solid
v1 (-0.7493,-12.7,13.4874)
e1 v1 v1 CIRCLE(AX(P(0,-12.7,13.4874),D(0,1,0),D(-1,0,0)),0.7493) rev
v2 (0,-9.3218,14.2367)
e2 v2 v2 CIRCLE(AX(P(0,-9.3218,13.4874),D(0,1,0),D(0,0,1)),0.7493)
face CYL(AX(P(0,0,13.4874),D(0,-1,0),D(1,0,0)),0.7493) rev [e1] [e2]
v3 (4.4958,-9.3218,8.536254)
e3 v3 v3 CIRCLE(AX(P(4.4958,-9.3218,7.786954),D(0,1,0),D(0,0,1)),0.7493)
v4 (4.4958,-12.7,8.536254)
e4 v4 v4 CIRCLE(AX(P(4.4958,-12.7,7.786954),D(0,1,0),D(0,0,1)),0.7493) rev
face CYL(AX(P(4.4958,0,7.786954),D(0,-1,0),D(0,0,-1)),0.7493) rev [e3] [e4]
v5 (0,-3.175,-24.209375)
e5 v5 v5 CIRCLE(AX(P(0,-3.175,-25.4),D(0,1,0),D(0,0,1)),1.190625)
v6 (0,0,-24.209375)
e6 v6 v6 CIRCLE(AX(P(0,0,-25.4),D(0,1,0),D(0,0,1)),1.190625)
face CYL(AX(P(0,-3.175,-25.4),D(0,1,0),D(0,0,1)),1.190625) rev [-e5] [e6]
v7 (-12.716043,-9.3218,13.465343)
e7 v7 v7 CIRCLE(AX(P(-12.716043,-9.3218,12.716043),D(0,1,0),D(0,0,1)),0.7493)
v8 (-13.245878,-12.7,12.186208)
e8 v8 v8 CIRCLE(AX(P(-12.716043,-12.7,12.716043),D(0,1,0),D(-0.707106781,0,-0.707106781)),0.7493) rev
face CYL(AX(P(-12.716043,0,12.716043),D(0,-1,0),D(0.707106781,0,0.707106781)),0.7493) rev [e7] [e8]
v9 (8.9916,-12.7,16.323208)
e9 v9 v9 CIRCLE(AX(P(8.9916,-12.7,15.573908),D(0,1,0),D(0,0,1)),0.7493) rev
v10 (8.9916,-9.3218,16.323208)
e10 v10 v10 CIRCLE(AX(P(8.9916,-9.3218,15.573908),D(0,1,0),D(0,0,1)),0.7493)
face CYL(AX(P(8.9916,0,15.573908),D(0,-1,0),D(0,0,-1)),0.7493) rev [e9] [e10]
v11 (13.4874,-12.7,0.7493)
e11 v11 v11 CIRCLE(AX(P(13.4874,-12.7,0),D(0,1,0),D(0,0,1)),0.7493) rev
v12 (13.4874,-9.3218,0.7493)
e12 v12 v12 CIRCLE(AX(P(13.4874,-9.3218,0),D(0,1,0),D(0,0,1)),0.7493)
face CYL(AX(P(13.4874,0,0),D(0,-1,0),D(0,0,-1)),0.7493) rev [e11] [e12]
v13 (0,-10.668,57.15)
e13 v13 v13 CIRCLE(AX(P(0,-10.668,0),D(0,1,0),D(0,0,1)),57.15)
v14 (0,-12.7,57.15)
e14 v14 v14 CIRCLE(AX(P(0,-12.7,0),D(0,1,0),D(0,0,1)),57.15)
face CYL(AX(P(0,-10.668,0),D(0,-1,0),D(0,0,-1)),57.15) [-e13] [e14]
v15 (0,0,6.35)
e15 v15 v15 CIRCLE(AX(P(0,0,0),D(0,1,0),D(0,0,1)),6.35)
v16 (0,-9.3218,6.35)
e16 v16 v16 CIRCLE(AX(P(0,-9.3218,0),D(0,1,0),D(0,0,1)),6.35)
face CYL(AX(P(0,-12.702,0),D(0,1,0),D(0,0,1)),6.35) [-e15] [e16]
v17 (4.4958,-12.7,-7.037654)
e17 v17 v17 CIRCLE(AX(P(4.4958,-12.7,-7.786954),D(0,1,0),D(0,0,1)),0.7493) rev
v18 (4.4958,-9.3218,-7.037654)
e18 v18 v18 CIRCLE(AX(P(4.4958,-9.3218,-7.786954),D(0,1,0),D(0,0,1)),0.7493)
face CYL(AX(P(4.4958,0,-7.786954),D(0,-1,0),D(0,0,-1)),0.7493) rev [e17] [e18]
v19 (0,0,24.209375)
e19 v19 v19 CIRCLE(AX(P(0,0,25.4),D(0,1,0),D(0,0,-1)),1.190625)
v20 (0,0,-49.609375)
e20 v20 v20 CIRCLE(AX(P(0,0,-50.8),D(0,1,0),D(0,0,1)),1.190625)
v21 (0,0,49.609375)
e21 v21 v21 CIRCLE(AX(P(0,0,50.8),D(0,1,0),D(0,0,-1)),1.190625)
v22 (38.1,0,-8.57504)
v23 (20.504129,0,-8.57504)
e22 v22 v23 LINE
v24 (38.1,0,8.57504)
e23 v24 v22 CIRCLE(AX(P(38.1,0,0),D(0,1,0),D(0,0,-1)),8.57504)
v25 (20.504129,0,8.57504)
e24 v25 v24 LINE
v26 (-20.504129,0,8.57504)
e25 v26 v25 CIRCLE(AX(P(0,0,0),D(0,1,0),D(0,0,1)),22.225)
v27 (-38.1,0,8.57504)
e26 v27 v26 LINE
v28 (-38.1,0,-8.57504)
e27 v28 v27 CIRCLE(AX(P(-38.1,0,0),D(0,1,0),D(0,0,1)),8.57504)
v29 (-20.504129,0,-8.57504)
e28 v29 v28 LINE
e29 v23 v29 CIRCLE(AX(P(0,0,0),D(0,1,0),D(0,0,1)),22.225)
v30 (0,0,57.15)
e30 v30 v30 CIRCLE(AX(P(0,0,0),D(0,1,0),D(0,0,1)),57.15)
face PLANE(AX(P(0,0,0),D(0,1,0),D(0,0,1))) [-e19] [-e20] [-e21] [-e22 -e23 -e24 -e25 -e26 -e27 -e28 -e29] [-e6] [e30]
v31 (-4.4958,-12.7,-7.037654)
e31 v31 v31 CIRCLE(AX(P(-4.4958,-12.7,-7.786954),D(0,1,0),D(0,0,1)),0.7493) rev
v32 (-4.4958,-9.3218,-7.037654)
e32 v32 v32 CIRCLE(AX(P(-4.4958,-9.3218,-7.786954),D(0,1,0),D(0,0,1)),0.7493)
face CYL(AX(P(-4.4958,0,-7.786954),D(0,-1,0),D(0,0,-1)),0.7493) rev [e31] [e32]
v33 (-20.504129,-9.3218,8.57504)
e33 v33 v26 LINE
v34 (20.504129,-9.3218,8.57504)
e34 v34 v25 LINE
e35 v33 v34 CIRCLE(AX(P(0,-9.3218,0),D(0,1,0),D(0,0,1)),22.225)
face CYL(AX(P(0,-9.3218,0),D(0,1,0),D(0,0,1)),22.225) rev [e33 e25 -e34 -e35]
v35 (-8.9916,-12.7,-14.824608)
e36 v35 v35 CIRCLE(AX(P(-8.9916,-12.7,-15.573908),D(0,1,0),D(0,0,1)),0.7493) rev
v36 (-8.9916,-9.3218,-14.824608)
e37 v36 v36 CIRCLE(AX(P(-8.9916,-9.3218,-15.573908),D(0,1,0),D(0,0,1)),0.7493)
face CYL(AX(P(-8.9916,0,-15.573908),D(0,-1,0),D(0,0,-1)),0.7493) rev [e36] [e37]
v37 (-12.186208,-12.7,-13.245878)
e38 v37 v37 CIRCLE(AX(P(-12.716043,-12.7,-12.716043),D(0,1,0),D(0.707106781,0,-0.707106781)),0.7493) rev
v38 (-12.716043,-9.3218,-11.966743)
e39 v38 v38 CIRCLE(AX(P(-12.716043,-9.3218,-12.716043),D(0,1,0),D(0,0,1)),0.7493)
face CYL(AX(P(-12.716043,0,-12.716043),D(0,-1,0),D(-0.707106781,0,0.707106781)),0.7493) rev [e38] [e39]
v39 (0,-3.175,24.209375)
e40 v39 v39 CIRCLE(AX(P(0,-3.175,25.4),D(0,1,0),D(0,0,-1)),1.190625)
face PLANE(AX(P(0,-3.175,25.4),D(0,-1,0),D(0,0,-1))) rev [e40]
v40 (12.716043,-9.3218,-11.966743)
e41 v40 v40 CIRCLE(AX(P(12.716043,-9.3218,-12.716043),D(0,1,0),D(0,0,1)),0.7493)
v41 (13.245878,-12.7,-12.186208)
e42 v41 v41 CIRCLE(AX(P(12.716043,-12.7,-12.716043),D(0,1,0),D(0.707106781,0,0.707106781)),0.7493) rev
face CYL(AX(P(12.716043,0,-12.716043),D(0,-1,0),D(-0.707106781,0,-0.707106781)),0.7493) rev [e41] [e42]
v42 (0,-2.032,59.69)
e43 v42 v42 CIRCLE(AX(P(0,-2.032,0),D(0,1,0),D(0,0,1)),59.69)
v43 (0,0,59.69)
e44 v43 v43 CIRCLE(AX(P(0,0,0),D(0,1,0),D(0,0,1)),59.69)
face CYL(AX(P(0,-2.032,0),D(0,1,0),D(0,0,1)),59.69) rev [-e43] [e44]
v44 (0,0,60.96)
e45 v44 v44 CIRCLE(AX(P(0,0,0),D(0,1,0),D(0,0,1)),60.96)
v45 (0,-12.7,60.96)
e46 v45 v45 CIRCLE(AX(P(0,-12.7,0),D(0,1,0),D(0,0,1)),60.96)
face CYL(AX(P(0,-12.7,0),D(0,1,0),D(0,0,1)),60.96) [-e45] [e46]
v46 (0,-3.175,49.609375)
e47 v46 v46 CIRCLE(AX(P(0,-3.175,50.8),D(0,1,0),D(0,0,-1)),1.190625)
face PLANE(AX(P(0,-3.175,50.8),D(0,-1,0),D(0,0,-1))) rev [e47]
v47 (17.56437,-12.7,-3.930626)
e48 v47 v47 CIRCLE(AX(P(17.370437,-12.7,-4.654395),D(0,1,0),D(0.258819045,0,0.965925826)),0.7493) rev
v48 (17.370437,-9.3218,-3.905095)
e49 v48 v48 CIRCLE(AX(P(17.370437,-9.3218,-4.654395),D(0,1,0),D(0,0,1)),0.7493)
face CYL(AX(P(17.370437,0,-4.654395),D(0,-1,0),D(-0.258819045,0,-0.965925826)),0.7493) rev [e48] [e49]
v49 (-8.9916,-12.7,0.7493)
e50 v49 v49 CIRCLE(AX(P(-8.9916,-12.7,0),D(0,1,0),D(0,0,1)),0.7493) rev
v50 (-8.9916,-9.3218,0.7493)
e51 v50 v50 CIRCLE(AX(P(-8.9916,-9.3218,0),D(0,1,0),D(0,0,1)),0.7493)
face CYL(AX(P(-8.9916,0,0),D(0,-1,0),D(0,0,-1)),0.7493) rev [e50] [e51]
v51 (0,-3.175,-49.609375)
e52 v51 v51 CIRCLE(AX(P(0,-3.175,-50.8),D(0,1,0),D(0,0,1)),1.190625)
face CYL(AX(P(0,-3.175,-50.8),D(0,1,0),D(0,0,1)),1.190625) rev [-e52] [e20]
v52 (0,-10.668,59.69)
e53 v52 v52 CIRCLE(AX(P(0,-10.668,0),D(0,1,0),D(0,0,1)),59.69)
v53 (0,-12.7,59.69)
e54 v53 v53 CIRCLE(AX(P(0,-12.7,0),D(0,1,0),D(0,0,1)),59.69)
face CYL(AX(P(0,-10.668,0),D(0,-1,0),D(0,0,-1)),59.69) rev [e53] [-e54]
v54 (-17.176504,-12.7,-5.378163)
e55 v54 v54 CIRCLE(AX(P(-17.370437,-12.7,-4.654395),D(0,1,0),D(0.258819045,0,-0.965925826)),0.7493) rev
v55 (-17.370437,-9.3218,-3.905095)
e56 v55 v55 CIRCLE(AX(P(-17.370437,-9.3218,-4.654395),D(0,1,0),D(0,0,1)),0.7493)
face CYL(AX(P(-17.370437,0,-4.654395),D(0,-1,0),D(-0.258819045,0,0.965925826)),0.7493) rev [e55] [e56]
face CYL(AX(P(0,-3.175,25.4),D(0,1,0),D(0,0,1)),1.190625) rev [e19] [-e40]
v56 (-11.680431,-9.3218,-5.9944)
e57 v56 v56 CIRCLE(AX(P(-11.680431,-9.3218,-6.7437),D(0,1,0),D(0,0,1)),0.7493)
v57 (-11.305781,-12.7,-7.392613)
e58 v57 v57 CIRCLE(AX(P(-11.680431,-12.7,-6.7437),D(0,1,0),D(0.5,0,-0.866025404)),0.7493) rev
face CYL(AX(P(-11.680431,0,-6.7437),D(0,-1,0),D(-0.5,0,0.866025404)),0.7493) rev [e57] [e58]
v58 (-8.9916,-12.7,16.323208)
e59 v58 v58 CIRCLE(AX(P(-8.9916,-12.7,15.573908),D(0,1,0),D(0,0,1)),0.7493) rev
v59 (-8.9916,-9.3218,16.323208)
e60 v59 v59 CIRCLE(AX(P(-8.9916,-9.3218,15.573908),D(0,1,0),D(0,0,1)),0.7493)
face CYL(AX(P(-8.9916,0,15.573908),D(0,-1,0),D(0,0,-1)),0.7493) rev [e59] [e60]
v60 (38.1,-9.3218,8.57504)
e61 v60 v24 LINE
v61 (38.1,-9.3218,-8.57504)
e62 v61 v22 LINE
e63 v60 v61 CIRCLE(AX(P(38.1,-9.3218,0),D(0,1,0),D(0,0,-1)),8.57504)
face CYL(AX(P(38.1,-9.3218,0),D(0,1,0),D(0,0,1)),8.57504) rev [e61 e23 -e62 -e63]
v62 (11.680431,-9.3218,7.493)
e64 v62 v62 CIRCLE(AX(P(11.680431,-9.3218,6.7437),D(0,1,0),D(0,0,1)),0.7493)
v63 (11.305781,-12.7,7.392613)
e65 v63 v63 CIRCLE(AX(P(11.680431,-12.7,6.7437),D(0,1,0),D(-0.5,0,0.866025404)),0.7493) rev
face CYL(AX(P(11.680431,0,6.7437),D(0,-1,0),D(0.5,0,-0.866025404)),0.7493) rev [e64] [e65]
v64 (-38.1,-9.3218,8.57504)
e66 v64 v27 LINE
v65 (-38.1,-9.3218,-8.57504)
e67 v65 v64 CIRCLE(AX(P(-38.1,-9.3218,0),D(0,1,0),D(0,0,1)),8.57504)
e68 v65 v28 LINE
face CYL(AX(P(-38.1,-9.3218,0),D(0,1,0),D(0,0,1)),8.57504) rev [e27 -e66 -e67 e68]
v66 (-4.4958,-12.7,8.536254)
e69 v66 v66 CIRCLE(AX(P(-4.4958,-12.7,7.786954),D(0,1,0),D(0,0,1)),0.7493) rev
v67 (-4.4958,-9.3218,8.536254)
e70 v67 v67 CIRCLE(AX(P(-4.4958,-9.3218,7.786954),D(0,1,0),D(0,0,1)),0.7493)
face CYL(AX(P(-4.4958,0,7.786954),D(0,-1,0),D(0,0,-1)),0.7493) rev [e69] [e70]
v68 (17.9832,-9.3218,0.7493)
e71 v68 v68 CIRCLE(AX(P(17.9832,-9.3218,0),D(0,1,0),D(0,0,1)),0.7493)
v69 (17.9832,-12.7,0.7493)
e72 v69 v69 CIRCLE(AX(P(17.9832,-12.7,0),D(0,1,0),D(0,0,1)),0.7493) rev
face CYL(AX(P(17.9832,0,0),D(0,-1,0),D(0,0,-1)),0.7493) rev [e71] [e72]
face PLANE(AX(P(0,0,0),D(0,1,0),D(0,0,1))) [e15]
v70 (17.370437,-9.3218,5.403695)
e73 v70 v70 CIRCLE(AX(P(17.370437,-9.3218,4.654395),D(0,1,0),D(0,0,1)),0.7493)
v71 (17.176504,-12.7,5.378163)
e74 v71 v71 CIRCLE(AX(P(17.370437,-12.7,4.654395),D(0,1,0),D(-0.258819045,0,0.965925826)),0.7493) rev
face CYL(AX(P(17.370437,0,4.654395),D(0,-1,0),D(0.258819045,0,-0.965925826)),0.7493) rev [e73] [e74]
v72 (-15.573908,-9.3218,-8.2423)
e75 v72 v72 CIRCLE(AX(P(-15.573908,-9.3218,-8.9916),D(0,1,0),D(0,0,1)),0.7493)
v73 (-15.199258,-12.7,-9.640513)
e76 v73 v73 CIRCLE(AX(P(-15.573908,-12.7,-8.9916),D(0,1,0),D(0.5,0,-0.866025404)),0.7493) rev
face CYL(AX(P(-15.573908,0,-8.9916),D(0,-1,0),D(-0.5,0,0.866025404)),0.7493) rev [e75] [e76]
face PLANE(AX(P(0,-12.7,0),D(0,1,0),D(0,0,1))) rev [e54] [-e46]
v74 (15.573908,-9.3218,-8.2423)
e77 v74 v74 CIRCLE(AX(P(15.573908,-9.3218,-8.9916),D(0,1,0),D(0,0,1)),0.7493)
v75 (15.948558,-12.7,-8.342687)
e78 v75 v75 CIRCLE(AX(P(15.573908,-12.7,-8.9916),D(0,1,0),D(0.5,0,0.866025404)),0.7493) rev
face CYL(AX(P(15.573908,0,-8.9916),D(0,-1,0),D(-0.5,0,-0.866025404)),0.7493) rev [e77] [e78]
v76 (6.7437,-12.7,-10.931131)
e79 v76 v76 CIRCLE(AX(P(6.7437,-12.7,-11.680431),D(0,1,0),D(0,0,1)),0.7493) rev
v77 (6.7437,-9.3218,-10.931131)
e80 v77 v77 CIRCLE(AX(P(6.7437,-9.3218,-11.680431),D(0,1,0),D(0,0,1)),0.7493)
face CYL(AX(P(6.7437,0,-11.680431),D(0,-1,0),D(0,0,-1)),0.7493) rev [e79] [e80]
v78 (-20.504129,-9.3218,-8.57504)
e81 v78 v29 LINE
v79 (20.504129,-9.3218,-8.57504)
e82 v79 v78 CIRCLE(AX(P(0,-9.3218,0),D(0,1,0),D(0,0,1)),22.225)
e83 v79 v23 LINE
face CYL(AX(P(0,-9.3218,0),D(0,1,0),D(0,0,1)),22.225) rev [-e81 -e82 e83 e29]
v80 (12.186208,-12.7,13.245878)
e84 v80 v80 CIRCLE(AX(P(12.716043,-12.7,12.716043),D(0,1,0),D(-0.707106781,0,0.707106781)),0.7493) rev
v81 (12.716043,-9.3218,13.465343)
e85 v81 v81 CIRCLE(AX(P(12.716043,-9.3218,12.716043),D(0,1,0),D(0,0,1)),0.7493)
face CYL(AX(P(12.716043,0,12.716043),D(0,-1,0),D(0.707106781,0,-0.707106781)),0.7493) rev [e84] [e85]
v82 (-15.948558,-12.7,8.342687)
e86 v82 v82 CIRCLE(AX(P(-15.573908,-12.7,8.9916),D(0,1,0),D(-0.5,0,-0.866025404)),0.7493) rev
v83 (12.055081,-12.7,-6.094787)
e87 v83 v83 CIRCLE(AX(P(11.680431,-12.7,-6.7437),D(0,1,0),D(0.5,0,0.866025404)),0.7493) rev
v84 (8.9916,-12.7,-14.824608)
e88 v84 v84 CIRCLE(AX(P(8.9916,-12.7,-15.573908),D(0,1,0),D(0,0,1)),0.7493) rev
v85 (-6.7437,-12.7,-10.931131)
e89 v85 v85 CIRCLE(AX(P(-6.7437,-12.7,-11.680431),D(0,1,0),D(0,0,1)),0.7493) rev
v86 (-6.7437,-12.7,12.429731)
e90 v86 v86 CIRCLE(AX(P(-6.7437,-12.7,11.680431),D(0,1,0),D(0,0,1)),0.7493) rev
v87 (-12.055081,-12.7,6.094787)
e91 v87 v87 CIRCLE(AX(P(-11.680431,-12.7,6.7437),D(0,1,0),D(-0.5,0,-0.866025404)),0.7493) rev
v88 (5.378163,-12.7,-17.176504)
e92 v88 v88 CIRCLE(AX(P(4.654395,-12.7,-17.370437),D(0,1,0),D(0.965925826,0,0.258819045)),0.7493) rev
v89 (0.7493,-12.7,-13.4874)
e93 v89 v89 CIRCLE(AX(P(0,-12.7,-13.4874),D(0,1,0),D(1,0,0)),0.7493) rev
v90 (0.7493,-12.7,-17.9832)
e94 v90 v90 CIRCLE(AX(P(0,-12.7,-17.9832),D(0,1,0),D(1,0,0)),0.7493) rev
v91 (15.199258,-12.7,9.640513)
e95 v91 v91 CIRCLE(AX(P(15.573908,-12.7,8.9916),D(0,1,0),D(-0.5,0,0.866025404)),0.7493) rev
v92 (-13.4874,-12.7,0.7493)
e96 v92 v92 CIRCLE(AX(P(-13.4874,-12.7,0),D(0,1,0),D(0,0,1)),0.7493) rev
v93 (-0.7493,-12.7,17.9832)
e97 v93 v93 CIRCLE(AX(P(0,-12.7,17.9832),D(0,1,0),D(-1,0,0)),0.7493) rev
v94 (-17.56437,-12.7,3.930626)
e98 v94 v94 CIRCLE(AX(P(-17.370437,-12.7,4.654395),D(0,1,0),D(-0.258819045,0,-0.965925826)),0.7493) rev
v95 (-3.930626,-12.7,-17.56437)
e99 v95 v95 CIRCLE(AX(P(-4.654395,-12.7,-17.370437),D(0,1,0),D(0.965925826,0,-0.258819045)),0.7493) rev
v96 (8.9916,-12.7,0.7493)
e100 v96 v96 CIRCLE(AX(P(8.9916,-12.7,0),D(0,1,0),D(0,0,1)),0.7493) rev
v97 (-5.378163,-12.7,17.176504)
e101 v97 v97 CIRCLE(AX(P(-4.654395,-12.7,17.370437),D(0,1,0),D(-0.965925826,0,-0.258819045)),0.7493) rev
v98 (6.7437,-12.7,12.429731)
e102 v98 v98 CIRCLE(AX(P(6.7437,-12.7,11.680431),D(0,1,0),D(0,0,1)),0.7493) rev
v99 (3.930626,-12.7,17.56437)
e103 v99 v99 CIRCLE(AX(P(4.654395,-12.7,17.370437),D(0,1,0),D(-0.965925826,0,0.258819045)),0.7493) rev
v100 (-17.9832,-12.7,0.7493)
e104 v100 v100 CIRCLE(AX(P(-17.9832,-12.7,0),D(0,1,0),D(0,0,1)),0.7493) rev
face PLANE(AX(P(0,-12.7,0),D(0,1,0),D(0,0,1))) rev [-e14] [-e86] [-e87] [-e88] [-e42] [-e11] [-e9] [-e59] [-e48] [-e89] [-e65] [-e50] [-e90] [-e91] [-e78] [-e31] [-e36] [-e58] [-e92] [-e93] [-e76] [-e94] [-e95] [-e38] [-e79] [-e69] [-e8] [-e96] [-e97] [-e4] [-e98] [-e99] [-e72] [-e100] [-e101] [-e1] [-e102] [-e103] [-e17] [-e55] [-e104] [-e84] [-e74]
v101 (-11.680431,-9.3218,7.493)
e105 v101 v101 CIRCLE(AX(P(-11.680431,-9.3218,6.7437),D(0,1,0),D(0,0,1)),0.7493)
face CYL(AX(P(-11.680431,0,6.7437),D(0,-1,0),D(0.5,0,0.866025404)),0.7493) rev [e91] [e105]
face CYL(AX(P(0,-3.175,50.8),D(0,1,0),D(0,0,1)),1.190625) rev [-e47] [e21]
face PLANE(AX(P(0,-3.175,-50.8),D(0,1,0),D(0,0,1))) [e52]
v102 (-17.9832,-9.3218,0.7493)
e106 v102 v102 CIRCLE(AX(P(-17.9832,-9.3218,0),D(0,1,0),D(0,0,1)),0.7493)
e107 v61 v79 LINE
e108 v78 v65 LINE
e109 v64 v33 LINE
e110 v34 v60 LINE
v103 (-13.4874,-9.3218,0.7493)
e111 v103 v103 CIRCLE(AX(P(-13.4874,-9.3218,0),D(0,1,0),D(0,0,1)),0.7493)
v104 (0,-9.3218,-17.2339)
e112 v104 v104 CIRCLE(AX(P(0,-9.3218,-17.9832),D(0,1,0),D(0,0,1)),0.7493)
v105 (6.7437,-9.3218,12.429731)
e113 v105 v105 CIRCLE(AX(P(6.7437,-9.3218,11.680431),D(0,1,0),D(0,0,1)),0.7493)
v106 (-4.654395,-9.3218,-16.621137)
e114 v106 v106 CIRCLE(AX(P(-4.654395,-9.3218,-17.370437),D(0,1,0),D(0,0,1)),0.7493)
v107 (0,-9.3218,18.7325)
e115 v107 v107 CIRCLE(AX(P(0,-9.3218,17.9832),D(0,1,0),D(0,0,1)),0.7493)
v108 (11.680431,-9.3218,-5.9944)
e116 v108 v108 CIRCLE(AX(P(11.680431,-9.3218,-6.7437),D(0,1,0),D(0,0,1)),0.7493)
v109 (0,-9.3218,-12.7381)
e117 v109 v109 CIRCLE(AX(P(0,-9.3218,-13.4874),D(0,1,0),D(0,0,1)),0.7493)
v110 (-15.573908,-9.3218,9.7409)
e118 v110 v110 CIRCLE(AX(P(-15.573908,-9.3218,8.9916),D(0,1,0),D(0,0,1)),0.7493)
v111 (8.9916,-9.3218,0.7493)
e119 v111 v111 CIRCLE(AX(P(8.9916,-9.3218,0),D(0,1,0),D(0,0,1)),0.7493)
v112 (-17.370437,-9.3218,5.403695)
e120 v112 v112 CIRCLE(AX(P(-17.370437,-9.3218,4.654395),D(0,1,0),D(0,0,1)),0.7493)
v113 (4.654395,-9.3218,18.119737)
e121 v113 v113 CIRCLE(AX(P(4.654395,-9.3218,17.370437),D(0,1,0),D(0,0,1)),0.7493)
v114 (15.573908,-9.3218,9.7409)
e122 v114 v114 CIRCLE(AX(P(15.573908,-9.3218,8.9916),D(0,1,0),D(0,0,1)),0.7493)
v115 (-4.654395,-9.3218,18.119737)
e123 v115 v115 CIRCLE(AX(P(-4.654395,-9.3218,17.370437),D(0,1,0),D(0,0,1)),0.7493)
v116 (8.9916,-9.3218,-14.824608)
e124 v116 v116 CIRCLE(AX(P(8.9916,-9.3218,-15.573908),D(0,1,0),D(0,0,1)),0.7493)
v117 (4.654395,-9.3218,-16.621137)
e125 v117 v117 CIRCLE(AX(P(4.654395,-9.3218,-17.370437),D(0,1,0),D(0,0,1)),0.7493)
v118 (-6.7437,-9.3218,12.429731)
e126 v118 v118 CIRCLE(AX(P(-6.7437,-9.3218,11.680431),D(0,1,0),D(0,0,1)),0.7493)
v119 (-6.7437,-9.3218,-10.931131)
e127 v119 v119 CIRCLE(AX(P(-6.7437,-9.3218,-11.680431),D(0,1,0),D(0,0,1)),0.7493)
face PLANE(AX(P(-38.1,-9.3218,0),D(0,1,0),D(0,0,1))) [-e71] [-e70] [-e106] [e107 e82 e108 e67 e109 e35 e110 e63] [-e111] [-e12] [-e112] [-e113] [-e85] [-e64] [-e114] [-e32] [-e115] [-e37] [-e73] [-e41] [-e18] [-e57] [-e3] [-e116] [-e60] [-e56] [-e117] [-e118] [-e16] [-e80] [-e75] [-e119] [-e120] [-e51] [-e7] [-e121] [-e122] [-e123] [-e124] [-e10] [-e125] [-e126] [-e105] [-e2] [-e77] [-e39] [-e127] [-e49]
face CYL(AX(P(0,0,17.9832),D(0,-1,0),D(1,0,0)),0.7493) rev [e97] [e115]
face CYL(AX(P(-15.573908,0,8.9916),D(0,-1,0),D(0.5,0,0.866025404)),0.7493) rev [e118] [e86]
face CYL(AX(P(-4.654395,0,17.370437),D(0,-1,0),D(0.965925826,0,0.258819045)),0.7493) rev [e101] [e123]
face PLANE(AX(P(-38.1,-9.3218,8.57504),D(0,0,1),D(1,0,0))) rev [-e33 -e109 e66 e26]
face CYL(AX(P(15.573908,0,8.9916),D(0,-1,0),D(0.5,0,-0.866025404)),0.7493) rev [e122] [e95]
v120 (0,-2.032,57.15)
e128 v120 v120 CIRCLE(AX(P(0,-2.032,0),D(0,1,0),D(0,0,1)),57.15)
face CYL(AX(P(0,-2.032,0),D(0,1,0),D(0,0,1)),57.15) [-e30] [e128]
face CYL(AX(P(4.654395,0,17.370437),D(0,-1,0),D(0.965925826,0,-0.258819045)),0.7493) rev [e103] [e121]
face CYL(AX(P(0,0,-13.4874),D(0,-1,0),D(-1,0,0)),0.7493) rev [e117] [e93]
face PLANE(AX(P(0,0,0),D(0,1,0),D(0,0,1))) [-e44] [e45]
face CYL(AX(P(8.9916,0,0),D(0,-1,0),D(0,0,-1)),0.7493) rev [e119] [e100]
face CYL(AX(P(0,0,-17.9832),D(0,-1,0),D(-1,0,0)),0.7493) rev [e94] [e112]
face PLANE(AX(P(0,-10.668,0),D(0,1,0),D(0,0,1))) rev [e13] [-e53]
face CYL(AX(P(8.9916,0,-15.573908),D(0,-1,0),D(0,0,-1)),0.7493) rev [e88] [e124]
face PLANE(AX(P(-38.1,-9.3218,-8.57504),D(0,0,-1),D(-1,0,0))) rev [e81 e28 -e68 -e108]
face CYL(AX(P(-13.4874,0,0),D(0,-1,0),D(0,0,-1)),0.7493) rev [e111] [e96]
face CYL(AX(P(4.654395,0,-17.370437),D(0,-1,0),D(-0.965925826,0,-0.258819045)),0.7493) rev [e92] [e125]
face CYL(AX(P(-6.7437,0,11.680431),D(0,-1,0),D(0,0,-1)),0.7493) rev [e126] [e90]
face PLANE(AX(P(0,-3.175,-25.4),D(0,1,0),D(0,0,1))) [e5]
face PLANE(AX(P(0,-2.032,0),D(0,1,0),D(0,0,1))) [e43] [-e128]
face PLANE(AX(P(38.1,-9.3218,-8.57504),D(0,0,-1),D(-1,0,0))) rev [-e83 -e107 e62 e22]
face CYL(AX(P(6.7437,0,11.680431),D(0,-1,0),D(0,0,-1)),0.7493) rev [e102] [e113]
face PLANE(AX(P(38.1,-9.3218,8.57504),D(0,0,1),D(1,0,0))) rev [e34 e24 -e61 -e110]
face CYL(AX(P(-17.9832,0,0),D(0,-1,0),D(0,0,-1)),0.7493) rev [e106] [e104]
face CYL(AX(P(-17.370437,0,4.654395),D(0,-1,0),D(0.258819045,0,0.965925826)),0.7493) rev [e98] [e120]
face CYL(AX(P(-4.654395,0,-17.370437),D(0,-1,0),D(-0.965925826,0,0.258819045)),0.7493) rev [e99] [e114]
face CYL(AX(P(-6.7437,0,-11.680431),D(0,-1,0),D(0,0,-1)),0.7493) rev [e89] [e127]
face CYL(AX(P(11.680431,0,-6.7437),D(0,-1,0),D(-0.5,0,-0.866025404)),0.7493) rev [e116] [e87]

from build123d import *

# Parameters (mm, degrees)
SKETCH1_R                       = 60.96
BILLET_DEPTH                    = 12.7
SKETCH4_R                       = 0.7493
FIRST_KEROSENE_OUTLET_DEPTH     = 88.140881336
SKETCH15_R                      = 59.69
SKETCH15_R_2                    = 57.15
CHAMBER_O_RING_DEPTH            = 2.032
TOP_START                       = -2.032
SKETCH16_R                      = 59.69
SKETCH16_R_2                    = 57.15
TOP_O_RING_DEPTH                = 2.032
PRIMARY_HOLES_COUNT             = 6
SECOND_START                    = -12.7
SECOND_RING_OUTLINE_R           = 0.7493
SECOND_RING_DEPTH               = 12.7
THIRD_START                     = -12.7
THIRD_RING_OUTLINE_R            = 0.7493
THIRD_RING_DEPTH                = 12.7
KEROSENE_WELL_DEPTH             = 9.3218
SKETCH17_R                      = 6.35
BOSS_EXTRUDE1_DEPTH             = 2.54
BOSS_EXTRUDE1_DIRECTION_2_REACH = 89.141
SKETCH19_R                      = 6.35
LOX_TOWER_DEPTH                 = 2.54
SKETCH20_R                      = 1.190625
DOWELS_DEPTH                    = 3.175


# Read off the part's stored shape, not the designer's step: Second ring, Third Ring
with BuildPart() as part:
    # Sketch1 → Billet (new body)
    with BuildSketch(Plane(origin=(0, 0, 0), x_dir=(1, 0, 0), z_dir=(0, 1, 0))):
        with Locations(Location((0, 0, 0), (0, 0, 270))):
            Circle(SKETCH1_R)
    extrude(amount=-BILLET_DEPTH)

    # Sketch4 → First Kerosene Outlet (cut, symmetric)
    with BuildSketch(Plane(origin=(0, -12.7, 0), x_dir=(1, 0, 0), z_dir=(0, 1, 0))):
        with Locations(Location((8.9916, 0, 0), (0, 0, 270))):
            Circle(SKETCH4_R)
        with Locations(Location((13.4874, 0, 0), (0, 0, 270))):
            Circle(SKETCH4_R)
        with Locations(Location((17.9832, 0, 0), (0, 0, 270))):
            Circle(SKETCH4_R)
    first_kerosene_outlet = extrude(amount=FIRST_KEROSENE_OUTLET_DEPTH, both=True, mode=Mode.SUBTRACT)

    # Sketch15 → Chamber O Ring (cut)
    with BuildSketch(Plane(origin=(0, -12.7, 0), x_dir=(1, 0, 0), z_dir=(0, 1, 0))):
        with Locations(Location((0, 0, 0), (0, 0, 270))):
            Circle(SKETCH15_R)
        with Locations(Location((0, 0, 0), (0, 0, 270))):
            Circle(SKETCH15_R_2, mode=Mode.SUBTRACT)
    extrude(amount=CHAMBER_O_RING_DEPTH, mode=Mode.SUBTRACT)

    # Sketch16 → Top O ring (cut)
    with BuildSketch(Plane(origin=(0, 0, 0), x_dir=(1, 0, 0), z_dir=(0, 1, 0)).offset(TOP_START)):
        with Locations(Location((0, 0, 0), (0, 0, 270))):
            Circle(SKETCH16_R)
        with Locations(Location((0, 0, 0), (0, 0, 270))):
            Circle(SKETCH16_R_2, mode=Mode.SUBTRACT)
    extrude(amount=TOP_O_RING_DEPTH, mode=Mode.SUBTRACT)

    # Primary Holes: First Kerosene Outlet ×6 about axis
    primary_holes_axis = Axis((0, 0, 0), (0, 1, 0))
    for i in range(1, PRIMARY_HOLES_COUNT):
        add(first_kerosene_outlet.rotate(primary_holes_axis, i * 360 / PRIMARY_HOLES_COUNT), mode=Mode.SUBTRACT)

    # Second ring outline → Second ring (cut)
    with BuildSketch(Plane(origin=(0, 0, 0), x_dir=(1, 0, 0), z_dir=(0, 1, 0)).offset(SECOND_START)):
        with Locations((11.680431031, 6.7437)):
            Circle(SECOND_RING_OUTLINE_R)
        with Locations((0, 13.4874)):
            Circle(SECOND_RING_OUTLINE_R)
        with Locations((-11.680431031, 6.7437)):
            Circle(SECOND_RING_OUTLINE_R)
        with Locations((-11.680431031, -6.7437)):
            Circle(SECOND_RING_OUTLINE_R)
        with Locations((0, -13.4874)):
            Circle(SECOND_RING_OUTLINE_R)
        with Locations((11.680431031, -6.7437)):
            Circle(SECOND_RING_OUTLINE_R)
    extrude(amount=SECOND_RING_DEPTH, mode=Mode.SUBTRACT)

    # Third Ring outline → Third Ring (cut)
    with BuildSketch(Plane(origin=(0, 0, 0), x_dir=(1, 0, 0), z_dir=(0, 1, 0)).offset(THIRD_START)):
        with Locations((17.370437319, 4.654394652)):
            Circle(THIRD_RING_OUTLINE_R)
        with Locations((15.573908041, 8.9916)):
            Circle(THIRD_RING_OUTLINE_R)
        with Locations((12.716042667, 12.716042667)):
            Circle(THIRD_RING_OUTLINE_R)
        with Locations((4.654394652, 17.370437319)):
            Circle(THIRD_RING_OUTLINE_R)
        with Locations((0, 17.9832)):
            Circle(THIRD_RING_OUTLINE_R)
        with Locations((-4.654394652, 17.370437319)):
            Circle(THIRD_RING_OUTLINE_R)
        with Locations((-12.716042667, 12.716042667)):
            Circle(THIRD_RING_OUTLINE_R)
        with Locations((-15.573908041, 8.9916)):
            Circle(THIRD_RING_OUTLINE_R)
        with Locations((-17.370437319, 4.654394652)):
            Circle(THIRD_RING_OUTLINE_R)
        with Locations((-17.370437319, -4.654394652)):
            Circle(THIRD_RING_OUTLINE_R)
        with Locations((-15.573908041, -8.9916)):
            Circle(THIRD_RING_OUTLINE_R)
        with Locations((-12.716042667, -12.716042667)):
            Circle(THIRD_RING_OUTLINE_R)
        with Locations((-4.654394652, -17.370437319)):
            Circle(THIRD_RING_OUTLINE_R)
        with Locations((0, -17.9832)):
            Circle(THIRD_RING_OUTLINE_R)
        with Locations((4.654394652, -17.370437319)):
            Circle(THIRD_RING_OUTLINE_R)
        with Locations((12.716042667, -12.716042667)):
            Circle(THIRD_RING_OUTLINE_R)
        with Locations((15.573908041, -8.9916)):
            Circle(THIRD_RING_OUTLINE_R)
        with Locations((17.370437319, -4.654394652)):
            Circle(THIRD_RING_OUTLINE_R)
    extrude(amount=THIRD_RING_DEPTH, mode=Mode.SUBTRACT)

    # Sketch18 → Kerosene Well (cut)
    with BuildSketch(Plane(origin=(0, 0, 0), x_dir=(1, 0, 0), z_dir=(0, 1, 0))):
        with BuildLine():
            Line((-38.1, 8.57504), (-20.504129194, 8.57504))
            ThreePointArc((-20.504129194, 8.57504), (0, 22.225), (20.504129194, 8.57504))
            Line((20.504129194, 8.57504), (38.1, 8.57504))
            ThreePointArc((38.1, 8.57504), (46.67504, 0), (38.1, -8.57504))
            Line((38.1, -8.57504), (20.504129194, -8.57504))
            ThreePointArc((20.504129194, -8.57504), (0, -22.225), (-20.504129194, -8.57504))
            Line((-20.504129194, -8.57504), (-38.1, -8.57504))
            ThreePointArc((-38.1, -8.57504), (-46.67504, 0), (-38.1, 8.57504))
        make_face()
    extrude(amount=-KEROSENE_WELL_DEPTH, mode=Mode.SUBTRACT)

    # Sketch17 → Boss-Extrude1 (add)
    with BuildSketch(Plane(origin=(0, 0, 0), x_dir=(1, 0, 0), z_dir=(0, 1, 0))):
        with Locations(Location((0, 0, 0), (0, 0, 270))):
            Circle(SKETCH17_R)
    extrude(amount=BOSS_EXTRUDE1_DEPTH)

    # Sketch17 → Boss-Extrude1 direction 2 (add, up to next)
    with BuildSketch(Plane(origin=(0, 0, 0), x_dir=(1, 0, 0), z_dir=(0, 1, 0)), mode=Mode.PRIVATE) as boss_extrude1_direction_2_sk1:
        with Locations(Location((0, 0, 0), (0, 0, 270))):
            Circle(SKETCH17_R)
    boss_extrude1_direction_2_tool1 = extrude(boss_extrude1_direction_2_sk1.sketch, amount=-BOSS_EXTRUDE1_DIRECTION_2_REACH, mode=Mode.PRIVATE) - part.part
    add(boss_extrude1_direction_2_tool1.solids().sort_by_distance((0, 0, 0))[0])

    # Sketch19 → Lox Tower (cut)
    with BuildSketch(Plane(origin=(0, 2.54, 0), x_dir=(1, 0, 0), z_dir=(0, 1, 0))):
        with Locations(Location((0, 0, 0), (0, 0, 270))):
            Circle(SKETCH19_R)
    extrude(amount=-LOX_TOWER_DEPTH, mode=Mode.SUBTRACT)

    # Sketch20 → Dowels (cut)
    with BuildSketch(Plane(origin=(0, 0, 0), x_dir=(1, 0, 0), z_dir=(0, 1, 0))):
        with Locations(Location((0, 25.4, 0), (0, 0, 270))):
            Circle(SKETCH20_R)
        with Locations(Location((0, -25.4, 0), (0, 0, 90))):
            Circle(SKETCH20_R)
        with Locations(Location((0, 50.8, 0), (0, 0, 270))):
            Circle(SKETCH20_R)
        with Locations(Location((0, -50.8, 0), (0, 0, 90))):
            Circle(SKETCH20_R)
    extrude(amount=-DOWELS_DEPTH, mode=Mode.SUBTRACT)


solid = part.part
